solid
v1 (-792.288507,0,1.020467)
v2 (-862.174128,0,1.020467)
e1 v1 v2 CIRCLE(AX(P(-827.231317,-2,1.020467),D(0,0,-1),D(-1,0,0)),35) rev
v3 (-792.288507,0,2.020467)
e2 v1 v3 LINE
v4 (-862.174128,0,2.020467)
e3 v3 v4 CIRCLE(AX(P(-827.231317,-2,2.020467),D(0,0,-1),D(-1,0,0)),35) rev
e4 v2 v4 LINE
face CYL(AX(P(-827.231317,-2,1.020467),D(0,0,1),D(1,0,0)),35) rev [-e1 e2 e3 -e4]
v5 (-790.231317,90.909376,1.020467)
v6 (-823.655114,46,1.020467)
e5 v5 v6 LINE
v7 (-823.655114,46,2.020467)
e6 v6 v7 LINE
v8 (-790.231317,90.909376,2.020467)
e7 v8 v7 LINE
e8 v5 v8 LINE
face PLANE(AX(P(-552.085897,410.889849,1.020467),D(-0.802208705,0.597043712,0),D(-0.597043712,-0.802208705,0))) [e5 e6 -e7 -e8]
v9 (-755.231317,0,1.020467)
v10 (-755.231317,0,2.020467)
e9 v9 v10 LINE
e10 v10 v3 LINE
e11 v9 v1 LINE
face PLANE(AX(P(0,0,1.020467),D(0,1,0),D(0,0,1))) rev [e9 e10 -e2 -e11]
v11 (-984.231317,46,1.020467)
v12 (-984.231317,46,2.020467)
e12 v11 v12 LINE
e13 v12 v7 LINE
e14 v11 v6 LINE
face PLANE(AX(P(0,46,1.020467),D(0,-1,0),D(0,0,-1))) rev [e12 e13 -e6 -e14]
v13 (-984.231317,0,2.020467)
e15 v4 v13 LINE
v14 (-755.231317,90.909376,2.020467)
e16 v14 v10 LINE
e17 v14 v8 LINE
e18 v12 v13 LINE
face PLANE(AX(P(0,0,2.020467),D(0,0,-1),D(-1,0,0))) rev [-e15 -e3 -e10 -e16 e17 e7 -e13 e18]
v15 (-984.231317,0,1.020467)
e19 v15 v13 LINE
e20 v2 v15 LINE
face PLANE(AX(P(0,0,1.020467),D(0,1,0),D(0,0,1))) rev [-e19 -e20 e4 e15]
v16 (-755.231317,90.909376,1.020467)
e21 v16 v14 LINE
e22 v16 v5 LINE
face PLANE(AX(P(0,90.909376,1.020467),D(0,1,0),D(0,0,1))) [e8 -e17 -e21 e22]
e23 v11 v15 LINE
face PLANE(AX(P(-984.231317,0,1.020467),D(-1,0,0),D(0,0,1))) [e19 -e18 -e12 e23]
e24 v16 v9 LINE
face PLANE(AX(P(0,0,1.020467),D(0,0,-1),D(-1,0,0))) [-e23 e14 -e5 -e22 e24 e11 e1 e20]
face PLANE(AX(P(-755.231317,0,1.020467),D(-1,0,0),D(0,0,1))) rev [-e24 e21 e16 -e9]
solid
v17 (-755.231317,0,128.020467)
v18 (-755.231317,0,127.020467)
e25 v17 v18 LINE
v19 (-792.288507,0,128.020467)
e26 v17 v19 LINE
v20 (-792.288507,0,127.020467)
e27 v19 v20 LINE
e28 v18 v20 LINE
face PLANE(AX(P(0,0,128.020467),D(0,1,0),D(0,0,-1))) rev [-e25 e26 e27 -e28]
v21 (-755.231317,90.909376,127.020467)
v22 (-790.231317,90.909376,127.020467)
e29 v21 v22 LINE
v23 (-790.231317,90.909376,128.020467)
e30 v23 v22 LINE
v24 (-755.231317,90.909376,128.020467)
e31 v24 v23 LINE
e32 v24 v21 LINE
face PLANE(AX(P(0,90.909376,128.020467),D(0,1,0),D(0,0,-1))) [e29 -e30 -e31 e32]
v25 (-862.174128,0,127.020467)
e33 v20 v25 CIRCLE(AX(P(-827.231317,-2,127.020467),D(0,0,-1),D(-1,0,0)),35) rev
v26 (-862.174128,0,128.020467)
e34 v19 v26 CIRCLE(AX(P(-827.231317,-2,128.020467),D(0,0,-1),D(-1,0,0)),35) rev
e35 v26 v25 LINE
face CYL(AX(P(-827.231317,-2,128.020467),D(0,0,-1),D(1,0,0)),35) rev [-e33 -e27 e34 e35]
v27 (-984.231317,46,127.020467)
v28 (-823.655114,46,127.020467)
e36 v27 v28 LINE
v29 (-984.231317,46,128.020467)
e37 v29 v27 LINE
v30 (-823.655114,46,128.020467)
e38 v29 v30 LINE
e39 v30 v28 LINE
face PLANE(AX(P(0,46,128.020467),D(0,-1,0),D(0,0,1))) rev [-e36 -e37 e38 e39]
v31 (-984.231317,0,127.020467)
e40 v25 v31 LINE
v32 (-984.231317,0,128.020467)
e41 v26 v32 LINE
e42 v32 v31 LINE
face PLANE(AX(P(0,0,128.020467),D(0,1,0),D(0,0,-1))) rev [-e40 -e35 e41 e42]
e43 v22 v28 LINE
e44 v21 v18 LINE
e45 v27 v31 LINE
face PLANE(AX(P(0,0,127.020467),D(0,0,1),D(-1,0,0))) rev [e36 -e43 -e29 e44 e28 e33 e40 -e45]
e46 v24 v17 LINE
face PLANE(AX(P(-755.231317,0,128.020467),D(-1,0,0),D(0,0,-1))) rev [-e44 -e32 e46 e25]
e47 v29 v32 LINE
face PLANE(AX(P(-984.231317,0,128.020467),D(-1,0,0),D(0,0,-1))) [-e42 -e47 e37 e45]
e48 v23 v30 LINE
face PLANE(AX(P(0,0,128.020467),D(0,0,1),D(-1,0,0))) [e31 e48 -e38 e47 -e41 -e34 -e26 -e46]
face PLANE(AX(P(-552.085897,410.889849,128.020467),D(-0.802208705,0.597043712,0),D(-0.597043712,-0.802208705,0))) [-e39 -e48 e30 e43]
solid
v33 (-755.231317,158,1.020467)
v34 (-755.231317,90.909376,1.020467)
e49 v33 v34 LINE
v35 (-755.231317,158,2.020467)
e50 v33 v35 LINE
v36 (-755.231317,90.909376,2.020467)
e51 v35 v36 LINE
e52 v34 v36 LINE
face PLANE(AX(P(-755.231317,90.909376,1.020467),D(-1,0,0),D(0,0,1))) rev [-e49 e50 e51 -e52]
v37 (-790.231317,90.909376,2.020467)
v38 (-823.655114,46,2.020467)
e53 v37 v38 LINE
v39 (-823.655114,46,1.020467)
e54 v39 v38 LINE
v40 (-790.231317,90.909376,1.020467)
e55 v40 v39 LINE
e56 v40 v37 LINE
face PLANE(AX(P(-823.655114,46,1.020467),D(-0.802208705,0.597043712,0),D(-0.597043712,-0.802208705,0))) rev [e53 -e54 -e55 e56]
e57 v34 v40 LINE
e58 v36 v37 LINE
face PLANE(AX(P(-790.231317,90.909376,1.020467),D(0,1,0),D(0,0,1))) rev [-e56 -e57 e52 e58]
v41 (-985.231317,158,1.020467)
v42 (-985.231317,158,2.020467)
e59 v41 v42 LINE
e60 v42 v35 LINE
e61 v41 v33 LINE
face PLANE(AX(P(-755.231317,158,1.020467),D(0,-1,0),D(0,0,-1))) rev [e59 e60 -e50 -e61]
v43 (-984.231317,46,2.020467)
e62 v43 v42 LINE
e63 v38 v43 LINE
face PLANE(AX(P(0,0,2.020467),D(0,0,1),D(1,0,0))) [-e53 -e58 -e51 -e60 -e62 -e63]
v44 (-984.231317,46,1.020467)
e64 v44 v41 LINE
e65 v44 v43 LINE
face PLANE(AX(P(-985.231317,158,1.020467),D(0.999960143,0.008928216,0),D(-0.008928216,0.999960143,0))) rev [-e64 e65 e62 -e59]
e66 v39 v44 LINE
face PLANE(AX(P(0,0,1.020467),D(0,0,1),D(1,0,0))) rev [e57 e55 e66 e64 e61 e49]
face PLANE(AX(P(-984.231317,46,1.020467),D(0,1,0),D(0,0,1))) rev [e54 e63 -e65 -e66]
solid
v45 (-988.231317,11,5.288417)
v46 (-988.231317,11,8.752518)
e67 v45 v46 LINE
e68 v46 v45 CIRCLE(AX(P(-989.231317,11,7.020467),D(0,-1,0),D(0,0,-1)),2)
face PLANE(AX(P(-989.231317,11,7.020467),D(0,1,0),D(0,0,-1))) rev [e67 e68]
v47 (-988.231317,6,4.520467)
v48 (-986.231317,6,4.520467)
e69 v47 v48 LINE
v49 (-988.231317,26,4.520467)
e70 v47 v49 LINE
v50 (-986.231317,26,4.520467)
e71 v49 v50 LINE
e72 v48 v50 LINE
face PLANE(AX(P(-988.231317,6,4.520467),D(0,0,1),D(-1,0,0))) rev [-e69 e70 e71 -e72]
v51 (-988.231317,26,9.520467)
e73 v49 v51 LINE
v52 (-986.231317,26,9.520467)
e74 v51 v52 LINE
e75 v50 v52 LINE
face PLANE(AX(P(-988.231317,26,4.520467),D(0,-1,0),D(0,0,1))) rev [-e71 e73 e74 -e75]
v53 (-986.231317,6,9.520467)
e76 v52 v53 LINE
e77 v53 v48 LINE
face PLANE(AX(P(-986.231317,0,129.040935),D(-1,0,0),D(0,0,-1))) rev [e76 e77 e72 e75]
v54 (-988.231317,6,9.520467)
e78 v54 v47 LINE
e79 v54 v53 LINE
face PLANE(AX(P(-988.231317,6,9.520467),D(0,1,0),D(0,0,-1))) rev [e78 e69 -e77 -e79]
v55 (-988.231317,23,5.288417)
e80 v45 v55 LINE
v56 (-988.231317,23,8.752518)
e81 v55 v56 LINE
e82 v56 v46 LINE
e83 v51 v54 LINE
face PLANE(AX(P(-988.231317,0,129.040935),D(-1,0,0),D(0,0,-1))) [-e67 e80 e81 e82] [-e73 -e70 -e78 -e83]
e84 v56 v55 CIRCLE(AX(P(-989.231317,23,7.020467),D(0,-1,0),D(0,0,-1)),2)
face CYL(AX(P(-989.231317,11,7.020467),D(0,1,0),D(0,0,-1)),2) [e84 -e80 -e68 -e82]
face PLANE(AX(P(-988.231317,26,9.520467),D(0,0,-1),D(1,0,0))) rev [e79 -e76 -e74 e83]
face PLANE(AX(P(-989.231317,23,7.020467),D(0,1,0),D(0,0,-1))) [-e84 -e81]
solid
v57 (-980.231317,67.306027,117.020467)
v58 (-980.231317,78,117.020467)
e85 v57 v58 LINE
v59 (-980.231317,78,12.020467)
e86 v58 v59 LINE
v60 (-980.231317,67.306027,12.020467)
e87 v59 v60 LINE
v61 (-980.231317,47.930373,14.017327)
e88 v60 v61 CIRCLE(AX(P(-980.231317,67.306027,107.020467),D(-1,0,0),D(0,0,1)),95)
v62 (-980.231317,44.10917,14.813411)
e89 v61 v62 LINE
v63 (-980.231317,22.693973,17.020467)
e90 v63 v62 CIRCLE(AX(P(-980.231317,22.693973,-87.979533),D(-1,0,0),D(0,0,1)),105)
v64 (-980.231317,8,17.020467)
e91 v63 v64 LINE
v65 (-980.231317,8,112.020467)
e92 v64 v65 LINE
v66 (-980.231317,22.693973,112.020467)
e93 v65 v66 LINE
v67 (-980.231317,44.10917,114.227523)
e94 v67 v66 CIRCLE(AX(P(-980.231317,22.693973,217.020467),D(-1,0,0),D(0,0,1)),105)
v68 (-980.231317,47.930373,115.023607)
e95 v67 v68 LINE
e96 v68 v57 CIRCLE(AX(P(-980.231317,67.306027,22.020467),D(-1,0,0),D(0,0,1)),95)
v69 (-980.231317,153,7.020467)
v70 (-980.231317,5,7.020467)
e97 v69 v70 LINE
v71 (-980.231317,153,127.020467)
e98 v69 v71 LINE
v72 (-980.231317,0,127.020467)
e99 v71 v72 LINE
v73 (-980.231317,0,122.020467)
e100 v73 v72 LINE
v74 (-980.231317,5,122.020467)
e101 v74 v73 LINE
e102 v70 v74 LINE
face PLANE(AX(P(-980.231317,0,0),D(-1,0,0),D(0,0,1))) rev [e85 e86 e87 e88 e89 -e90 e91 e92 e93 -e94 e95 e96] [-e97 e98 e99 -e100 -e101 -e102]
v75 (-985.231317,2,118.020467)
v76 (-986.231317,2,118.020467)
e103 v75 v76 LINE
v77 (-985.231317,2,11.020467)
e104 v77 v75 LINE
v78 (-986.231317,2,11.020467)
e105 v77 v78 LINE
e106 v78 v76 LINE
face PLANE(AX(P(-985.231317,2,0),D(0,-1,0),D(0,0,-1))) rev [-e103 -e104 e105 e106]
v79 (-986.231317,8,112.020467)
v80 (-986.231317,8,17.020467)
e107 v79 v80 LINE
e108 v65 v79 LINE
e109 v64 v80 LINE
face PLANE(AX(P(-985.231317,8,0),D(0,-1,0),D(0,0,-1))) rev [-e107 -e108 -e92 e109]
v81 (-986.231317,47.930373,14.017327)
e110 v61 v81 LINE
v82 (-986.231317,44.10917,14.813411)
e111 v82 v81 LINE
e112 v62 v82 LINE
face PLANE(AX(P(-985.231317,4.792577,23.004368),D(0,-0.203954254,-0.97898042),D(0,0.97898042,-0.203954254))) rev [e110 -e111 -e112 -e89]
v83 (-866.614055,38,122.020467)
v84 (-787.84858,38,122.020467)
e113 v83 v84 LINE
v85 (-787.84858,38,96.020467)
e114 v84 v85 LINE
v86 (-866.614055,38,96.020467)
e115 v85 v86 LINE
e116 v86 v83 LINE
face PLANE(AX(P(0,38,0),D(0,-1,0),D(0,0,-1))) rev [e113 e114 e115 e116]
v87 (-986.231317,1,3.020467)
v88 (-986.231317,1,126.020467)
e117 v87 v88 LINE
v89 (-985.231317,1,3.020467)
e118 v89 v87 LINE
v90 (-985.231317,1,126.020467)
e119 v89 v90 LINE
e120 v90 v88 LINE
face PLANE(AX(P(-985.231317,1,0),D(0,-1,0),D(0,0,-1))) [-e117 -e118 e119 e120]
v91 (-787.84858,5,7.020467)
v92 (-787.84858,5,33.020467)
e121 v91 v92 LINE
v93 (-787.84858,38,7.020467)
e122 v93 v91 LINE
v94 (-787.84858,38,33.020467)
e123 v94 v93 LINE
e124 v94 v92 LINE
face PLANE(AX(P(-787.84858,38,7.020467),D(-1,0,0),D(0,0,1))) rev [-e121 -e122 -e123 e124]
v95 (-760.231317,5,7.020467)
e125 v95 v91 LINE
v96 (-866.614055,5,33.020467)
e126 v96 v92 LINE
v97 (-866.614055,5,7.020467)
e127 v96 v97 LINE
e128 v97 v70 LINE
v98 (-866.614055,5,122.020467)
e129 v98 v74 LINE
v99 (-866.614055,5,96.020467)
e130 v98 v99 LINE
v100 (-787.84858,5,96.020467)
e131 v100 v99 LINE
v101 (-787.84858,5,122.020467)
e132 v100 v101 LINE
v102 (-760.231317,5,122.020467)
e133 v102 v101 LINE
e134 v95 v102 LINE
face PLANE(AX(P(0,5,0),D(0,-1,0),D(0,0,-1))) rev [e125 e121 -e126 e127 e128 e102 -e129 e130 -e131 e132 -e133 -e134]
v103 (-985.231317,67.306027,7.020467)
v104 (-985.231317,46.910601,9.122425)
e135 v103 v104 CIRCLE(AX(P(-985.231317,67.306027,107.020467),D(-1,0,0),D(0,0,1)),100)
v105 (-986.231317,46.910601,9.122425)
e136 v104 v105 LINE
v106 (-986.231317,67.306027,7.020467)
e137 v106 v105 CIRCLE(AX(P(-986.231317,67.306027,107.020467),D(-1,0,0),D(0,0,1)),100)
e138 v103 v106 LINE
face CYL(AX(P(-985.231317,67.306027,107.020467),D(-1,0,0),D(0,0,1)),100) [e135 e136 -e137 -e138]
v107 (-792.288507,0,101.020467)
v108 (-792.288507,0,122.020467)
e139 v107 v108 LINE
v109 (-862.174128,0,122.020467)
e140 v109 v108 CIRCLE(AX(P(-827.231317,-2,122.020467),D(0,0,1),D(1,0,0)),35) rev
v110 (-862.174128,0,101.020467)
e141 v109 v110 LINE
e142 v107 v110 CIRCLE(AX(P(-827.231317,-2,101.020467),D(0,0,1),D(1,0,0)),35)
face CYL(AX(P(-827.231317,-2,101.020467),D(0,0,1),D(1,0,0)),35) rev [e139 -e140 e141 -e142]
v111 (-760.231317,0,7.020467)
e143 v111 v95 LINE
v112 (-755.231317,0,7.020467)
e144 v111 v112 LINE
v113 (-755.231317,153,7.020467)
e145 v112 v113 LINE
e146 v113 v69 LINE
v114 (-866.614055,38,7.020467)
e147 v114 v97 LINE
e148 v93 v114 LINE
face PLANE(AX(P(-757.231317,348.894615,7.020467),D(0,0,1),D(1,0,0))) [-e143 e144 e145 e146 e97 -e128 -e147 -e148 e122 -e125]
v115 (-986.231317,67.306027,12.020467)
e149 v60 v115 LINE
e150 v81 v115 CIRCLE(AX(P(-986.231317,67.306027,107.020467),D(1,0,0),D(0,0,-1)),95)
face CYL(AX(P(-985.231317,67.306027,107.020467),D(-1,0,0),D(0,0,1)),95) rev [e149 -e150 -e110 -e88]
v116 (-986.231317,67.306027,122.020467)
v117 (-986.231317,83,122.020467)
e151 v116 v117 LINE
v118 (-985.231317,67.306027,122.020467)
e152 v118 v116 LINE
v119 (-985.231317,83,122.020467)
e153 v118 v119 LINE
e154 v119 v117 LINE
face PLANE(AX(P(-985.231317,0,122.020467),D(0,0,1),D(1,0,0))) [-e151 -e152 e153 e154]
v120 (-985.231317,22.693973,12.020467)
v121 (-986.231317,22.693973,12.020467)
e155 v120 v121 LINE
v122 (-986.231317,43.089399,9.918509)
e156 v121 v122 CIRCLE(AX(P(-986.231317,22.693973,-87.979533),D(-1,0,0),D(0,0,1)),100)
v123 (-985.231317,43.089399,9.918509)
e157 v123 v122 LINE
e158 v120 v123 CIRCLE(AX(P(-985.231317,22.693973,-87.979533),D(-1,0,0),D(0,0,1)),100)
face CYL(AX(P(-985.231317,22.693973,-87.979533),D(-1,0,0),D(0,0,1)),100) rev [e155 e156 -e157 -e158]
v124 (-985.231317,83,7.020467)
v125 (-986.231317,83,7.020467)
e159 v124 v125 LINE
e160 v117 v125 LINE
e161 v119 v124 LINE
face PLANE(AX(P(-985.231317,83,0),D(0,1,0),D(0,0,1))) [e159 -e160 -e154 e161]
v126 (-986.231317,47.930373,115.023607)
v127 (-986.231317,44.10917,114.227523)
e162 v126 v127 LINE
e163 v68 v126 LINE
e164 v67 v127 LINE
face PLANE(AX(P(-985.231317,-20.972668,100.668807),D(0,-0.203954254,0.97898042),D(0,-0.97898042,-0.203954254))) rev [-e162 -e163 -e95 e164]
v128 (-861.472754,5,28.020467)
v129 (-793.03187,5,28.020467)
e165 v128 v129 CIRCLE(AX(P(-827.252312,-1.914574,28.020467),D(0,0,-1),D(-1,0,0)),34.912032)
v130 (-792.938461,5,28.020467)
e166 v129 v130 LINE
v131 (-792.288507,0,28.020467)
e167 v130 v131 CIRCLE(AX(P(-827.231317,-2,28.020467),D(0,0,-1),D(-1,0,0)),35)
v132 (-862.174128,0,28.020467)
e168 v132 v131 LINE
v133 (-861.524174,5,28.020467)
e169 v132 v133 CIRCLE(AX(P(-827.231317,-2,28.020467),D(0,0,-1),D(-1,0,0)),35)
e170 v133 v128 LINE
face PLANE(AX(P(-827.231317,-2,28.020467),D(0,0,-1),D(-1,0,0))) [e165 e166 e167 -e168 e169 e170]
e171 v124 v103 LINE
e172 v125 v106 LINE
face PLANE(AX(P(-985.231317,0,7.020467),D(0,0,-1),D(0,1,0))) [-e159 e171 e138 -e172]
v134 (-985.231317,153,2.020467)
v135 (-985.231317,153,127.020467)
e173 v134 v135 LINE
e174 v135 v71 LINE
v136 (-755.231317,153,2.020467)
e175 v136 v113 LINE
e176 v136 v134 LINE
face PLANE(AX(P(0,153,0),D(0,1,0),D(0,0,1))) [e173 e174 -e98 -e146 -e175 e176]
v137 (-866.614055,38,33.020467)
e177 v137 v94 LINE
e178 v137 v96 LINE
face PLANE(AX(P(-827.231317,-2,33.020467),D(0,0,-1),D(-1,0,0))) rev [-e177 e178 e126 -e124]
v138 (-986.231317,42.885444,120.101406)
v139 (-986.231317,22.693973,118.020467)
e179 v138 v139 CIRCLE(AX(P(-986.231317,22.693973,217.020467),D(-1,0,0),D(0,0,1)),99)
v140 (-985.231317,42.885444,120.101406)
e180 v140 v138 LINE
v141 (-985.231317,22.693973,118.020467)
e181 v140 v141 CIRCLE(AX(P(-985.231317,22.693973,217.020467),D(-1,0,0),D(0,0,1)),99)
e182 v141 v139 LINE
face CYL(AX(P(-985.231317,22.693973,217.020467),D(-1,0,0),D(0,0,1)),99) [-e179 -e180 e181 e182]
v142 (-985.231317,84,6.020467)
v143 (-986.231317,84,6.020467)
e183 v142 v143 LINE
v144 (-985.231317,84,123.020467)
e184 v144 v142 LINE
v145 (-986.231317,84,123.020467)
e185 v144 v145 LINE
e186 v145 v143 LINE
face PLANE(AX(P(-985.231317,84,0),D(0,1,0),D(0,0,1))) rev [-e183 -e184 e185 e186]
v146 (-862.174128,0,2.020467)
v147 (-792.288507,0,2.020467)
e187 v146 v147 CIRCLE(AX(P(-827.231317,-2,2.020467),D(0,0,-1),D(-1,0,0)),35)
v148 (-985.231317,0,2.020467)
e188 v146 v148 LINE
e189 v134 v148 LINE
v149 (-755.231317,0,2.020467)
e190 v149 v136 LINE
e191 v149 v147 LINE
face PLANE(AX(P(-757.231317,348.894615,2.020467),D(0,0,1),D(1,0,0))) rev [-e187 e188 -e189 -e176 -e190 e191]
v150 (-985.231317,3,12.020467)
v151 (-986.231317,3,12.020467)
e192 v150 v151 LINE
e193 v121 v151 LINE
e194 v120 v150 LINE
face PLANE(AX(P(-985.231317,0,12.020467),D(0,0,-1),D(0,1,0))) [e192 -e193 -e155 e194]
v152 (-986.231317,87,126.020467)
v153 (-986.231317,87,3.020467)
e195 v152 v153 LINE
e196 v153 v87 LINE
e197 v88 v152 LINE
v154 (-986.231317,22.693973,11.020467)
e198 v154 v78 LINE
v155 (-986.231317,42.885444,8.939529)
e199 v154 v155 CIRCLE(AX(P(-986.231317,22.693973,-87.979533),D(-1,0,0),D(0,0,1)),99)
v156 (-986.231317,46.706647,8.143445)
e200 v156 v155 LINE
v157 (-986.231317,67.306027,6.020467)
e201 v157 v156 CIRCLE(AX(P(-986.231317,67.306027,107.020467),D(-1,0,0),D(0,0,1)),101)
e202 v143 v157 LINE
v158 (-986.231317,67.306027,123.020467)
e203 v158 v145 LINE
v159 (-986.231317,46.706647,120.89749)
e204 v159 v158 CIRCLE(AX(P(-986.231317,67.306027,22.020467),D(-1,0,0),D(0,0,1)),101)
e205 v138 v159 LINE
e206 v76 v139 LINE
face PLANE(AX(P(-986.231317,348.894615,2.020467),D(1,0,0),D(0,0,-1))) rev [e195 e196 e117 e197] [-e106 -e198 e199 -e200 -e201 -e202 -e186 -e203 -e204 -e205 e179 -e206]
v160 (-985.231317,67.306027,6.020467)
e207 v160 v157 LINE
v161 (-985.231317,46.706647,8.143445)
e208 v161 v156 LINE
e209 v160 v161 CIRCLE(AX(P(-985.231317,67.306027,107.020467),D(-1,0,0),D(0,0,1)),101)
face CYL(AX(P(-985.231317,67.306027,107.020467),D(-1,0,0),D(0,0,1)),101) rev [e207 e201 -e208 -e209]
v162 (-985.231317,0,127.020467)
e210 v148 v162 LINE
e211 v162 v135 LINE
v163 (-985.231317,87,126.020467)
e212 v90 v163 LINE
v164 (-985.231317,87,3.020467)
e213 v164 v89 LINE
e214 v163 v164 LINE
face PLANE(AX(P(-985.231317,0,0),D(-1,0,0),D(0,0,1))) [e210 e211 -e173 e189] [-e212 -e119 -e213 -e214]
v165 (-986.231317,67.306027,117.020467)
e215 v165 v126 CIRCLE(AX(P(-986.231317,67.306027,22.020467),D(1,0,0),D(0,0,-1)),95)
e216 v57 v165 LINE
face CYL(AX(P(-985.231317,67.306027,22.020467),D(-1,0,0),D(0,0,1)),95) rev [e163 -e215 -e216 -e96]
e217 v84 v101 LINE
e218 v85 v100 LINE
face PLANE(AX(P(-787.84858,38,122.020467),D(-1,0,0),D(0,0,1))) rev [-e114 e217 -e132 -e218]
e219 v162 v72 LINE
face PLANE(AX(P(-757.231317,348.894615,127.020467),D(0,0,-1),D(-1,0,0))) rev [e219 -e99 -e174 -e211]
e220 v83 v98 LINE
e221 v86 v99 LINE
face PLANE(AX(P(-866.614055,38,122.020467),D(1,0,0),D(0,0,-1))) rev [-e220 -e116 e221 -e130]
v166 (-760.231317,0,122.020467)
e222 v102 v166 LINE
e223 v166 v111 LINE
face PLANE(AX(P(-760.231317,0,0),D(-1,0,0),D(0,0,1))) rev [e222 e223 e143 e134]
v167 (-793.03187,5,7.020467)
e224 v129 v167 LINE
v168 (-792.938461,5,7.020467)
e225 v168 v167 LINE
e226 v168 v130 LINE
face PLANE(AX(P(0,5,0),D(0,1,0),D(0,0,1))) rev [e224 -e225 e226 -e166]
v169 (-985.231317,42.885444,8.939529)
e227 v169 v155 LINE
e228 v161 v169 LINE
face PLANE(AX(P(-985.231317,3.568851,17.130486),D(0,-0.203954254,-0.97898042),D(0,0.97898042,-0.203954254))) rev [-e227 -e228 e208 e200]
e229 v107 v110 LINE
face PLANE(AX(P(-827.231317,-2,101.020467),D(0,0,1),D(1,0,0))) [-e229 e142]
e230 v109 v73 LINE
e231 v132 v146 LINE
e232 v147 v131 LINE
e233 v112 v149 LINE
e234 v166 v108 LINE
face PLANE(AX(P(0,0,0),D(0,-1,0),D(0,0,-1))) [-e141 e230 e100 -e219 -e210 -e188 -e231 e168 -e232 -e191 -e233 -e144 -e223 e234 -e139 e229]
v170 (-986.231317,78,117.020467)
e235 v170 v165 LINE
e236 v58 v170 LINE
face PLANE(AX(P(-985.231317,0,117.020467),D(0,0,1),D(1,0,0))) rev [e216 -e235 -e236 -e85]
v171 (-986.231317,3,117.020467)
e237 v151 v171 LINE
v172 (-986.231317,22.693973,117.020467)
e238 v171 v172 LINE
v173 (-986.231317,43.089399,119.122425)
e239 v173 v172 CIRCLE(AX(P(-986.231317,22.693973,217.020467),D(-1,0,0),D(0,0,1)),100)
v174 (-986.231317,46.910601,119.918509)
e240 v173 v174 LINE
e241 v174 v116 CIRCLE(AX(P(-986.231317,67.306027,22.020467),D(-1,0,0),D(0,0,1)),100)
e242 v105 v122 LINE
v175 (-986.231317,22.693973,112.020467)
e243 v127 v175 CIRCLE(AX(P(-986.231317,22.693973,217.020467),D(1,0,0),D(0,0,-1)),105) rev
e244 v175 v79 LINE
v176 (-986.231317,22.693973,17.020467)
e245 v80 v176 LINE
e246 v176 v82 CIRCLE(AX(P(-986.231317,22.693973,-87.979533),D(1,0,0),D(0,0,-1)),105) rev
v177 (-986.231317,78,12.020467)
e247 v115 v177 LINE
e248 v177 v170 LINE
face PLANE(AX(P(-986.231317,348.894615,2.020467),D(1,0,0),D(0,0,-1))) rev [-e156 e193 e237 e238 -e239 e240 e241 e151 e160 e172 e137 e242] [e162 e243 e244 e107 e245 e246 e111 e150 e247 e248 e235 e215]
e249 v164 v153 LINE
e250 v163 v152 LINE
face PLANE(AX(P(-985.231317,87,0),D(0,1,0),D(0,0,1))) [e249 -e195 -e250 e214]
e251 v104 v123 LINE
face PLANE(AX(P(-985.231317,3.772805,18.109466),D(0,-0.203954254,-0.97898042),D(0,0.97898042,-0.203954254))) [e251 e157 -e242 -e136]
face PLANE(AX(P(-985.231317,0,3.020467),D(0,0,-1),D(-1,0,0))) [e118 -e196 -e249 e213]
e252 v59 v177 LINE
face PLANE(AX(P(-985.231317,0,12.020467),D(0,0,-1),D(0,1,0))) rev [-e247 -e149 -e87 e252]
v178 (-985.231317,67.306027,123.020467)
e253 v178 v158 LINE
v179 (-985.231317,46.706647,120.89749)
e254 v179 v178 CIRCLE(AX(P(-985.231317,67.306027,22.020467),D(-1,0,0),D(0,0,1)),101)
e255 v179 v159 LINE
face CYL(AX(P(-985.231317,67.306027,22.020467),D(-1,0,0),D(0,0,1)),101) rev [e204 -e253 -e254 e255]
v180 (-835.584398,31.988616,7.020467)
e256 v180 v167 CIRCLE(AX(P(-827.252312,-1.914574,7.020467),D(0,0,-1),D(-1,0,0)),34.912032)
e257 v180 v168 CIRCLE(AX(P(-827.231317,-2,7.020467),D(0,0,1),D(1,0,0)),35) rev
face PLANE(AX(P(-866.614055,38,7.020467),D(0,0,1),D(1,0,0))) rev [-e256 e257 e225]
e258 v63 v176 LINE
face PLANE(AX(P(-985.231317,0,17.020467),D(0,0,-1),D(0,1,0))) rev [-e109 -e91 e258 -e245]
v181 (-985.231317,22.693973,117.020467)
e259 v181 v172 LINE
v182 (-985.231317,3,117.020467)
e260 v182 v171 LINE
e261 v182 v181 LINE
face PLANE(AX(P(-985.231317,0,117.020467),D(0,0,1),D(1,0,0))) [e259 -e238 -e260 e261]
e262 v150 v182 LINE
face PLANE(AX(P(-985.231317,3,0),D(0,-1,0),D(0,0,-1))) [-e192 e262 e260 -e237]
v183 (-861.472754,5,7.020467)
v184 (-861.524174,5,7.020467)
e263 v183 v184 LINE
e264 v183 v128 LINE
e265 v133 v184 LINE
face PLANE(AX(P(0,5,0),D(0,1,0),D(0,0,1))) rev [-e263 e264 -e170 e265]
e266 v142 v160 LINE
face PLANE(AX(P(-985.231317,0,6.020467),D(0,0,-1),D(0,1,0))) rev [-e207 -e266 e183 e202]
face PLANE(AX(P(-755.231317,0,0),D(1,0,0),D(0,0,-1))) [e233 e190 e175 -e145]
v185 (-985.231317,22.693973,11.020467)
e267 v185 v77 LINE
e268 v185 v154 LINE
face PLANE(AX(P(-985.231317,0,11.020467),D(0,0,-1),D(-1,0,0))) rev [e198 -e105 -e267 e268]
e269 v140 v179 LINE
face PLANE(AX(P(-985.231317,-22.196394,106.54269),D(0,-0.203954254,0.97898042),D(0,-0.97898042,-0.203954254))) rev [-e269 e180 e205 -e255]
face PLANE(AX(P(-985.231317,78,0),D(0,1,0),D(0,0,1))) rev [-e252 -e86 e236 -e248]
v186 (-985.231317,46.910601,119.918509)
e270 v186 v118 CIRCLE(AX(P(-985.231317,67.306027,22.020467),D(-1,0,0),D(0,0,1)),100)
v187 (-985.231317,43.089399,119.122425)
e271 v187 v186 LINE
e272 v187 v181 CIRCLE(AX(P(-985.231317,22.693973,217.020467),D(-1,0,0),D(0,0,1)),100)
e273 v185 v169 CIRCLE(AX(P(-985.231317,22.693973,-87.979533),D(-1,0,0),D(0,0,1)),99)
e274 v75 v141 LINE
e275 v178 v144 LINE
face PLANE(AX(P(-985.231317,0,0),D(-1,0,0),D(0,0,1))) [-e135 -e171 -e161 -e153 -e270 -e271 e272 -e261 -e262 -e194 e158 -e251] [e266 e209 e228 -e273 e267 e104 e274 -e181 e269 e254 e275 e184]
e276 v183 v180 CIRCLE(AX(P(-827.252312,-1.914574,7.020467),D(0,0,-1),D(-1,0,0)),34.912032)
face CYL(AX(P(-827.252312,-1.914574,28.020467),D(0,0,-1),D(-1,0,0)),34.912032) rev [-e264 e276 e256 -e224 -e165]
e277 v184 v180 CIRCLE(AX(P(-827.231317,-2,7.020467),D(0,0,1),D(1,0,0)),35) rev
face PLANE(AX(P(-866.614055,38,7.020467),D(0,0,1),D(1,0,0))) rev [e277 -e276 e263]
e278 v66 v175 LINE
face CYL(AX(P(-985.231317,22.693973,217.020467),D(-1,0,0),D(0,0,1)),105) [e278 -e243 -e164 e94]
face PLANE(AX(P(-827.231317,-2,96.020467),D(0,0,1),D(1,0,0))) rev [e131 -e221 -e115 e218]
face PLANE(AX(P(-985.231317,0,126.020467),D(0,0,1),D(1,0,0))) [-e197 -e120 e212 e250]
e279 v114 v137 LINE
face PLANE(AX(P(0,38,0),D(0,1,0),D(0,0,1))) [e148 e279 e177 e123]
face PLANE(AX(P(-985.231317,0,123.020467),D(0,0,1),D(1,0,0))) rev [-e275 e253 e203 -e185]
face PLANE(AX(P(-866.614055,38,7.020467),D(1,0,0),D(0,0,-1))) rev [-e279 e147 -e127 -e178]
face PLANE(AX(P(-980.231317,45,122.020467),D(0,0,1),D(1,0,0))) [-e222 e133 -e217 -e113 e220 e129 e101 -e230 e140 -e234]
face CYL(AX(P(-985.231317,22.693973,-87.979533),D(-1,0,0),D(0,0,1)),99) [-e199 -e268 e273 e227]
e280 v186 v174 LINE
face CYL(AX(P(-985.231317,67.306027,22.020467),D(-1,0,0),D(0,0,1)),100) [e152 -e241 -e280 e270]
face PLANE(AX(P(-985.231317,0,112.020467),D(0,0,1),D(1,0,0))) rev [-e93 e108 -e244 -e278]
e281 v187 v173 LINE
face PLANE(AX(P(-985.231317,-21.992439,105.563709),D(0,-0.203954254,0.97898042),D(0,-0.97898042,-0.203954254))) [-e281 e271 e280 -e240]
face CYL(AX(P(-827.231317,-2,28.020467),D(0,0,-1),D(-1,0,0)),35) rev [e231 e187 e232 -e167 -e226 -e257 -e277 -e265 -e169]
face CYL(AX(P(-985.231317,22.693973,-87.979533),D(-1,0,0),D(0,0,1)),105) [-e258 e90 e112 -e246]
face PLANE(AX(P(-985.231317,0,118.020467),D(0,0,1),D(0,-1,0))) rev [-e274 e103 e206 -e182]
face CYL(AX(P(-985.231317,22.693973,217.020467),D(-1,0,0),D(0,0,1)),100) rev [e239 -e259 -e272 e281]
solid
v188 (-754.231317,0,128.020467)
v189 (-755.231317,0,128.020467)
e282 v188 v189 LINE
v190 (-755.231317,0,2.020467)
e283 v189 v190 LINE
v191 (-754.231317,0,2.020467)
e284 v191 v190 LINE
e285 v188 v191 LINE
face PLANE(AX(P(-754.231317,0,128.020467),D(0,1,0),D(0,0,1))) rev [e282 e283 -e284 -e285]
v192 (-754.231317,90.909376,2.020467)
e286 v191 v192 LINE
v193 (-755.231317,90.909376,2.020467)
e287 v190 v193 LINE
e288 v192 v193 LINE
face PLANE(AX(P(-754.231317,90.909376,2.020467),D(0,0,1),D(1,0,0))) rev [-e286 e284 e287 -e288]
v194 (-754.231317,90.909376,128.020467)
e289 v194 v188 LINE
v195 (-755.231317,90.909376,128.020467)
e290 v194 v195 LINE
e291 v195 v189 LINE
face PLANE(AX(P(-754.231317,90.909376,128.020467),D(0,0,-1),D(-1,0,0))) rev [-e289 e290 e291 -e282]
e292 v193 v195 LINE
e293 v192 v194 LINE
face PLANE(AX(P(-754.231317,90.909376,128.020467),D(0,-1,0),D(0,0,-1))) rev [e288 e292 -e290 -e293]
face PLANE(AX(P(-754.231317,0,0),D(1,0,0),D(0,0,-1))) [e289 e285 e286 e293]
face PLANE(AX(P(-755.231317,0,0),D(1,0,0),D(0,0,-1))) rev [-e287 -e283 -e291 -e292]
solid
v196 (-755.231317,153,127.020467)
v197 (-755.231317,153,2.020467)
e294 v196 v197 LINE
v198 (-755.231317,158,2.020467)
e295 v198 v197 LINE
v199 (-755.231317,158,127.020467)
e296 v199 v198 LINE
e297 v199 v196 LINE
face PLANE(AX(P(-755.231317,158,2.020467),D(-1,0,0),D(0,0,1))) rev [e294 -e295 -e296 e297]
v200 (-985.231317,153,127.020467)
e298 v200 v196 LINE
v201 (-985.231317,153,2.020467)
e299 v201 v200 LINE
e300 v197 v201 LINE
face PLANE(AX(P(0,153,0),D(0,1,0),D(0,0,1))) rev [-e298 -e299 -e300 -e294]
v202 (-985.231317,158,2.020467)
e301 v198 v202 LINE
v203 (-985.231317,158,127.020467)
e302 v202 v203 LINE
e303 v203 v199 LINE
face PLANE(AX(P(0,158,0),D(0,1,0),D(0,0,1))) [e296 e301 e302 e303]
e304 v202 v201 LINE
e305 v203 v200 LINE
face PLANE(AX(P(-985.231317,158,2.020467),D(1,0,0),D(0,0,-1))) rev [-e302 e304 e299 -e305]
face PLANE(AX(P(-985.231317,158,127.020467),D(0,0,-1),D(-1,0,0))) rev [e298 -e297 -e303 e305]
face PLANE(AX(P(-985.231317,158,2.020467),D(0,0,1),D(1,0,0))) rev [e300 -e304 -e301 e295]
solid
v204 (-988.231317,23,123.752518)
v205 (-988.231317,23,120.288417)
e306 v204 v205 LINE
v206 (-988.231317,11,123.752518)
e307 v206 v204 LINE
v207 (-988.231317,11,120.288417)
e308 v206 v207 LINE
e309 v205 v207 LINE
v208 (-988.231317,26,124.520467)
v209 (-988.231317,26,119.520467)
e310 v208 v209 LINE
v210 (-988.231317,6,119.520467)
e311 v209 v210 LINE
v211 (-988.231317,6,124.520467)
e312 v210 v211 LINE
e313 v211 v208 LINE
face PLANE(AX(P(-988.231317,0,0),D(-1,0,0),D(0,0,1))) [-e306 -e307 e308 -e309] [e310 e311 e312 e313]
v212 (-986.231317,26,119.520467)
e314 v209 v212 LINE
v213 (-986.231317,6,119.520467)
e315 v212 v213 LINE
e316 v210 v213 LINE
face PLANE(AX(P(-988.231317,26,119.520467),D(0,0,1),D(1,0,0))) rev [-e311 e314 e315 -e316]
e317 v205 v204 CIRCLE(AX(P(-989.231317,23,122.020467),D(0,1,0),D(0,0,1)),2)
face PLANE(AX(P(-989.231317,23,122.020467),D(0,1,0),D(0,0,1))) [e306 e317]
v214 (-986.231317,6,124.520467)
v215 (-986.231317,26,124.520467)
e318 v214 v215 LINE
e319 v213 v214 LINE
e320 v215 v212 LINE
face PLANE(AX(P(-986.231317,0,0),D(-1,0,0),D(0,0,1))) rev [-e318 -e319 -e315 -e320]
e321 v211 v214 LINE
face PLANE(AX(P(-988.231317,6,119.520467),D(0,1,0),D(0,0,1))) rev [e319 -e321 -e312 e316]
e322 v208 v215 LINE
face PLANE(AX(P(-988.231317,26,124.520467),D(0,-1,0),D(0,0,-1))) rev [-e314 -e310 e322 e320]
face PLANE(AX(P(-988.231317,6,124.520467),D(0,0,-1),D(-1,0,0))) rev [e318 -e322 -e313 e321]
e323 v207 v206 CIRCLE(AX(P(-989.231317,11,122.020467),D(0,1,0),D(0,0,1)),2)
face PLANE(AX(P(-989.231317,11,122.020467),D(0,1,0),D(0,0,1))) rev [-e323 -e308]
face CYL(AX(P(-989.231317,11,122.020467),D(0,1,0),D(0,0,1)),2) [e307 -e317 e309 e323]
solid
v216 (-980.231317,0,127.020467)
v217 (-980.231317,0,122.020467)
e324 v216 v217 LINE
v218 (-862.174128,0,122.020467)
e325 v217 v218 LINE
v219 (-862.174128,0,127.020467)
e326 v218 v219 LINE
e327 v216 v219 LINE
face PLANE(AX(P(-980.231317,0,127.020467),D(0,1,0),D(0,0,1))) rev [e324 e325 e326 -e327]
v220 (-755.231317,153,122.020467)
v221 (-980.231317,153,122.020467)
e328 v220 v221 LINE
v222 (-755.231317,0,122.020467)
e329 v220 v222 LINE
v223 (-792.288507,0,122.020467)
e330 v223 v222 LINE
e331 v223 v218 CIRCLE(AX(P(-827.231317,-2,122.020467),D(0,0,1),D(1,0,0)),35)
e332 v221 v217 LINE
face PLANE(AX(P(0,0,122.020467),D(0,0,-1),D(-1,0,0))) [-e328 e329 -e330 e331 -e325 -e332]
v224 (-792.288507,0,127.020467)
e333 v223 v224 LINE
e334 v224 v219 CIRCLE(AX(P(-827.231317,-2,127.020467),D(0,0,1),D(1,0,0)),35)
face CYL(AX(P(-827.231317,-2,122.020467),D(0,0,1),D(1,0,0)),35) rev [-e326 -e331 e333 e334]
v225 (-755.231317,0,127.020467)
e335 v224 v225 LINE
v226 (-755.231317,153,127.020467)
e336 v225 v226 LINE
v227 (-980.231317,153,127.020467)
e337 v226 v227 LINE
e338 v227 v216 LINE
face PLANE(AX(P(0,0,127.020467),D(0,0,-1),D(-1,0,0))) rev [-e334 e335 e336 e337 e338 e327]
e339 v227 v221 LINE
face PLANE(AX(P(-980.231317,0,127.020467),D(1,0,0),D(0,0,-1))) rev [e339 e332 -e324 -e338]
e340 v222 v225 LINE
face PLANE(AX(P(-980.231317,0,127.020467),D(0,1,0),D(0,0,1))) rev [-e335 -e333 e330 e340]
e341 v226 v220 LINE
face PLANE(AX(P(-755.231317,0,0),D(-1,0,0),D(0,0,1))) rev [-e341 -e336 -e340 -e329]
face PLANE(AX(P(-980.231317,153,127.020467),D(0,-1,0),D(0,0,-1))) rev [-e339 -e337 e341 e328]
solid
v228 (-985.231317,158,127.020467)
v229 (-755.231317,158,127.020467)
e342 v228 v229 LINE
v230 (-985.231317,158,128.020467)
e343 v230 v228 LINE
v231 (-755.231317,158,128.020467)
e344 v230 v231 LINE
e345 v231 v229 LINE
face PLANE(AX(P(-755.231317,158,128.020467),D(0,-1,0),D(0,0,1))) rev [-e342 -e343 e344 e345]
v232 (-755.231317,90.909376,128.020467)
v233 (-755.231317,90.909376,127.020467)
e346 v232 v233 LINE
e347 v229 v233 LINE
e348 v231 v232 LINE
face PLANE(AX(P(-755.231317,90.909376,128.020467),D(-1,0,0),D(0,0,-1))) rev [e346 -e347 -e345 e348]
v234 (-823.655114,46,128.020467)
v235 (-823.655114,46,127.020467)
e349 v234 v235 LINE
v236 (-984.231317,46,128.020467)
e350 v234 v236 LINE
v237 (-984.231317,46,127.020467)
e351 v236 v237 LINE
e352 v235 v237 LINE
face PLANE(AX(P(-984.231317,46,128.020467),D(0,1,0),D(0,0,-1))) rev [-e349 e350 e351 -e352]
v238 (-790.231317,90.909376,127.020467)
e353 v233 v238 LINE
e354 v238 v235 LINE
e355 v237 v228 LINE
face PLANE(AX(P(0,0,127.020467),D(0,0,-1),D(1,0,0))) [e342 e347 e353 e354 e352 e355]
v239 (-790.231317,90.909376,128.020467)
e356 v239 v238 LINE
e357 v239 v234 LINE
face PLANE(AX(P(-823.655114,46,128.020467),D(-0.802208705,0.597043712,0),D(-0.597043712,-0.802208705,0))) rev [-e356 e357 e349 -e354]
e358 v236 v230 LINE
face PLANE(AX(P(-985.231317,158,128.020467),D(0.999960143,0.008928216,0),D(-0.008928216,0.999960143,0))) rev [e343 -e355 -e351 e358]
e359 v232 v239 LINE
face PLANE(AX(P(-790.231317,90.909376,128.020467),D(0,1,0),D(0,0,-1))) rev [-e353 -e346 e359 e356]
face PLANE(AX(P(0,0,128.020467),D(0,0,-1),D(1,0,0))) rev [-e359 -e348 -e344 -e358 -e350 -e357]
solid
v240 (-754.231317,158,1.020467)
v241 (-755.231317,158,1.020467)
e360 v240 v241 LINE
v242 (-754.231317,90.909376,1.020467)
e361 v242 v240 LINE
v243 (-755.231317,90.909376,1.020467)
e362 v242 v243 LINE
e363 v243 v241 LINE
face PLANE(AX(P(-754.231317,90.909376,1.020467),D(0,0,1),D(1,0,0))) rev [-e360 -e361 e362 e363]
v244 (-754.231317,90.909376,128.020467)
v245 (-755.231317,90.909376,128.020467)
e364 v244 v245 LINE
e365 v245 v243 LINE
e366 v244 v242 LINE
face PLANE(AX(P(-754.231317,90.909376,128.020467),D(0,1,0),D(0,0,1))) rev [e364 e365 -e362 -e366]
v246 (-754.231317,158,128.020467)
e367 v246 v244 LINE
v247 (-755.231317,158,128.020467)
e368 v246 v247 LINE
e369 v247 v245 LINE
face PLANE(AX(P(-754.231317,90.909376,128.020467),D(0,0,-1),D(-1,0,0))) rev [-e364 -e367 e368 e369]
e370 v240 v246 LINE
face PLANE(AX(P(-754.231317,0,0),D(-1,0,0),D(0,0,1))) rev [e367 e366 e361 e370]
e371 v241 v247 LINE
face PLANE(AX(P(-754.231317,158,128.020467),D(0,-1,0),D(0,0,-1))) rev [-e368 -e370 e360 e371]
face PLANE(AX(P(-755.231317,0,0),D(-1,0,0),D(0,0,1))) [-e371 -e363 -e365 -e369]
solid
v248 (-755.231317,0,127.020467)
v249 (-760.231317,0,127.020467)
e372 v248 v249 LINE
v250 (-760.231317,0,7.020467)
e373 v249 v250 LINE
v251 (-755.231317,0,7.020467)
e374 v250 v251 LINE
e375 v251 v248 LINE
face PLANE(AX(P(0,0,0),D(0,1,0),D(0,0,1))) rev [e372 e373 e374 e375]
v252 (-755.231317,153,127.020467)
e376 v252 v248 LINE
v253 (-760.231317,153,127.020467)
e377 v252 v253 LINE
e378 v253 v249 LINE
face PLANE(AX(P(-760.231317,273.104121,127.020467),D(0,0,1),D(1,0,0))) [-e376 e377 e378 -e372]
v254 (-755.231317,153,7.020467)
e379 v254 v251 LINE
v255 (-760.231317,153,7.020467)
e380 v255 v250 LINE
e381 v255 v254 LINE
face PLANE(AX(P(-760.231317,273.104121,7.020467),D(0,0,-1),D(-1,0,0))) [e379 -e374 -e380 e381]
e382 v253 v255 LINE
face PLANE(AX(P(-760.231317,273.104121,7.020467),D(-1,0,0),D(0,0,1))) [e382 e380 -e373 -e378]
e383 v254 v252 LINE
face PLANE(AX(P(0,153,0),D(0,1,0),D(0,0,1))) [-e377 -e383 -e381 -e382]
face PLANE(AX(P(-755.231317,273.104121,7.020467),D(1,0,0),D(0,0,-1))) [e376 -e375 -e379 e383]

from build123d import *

# Parameters (mm, degrees)
SKETCH_1_W                = 229
SKETCH_1_H                = 125
EXTRUDE_1_DEPTH           = 88
SKETCH_4_W                = 125
SKETCH_4_H                = 88
SKETCH_4_W_2              = 123
SKETCH_4_H_2              = 86
CUT_EXTRUDE_3_DEPTH       = 1
SKETCH_5_W                = 125
SKETCH_5_H                = 88
EXTRUDE_2_DEPTH           = 1
SKETCH_11_W               = 5
SKETCH_11_H               = 20
EXTRUDE_3_DEPTH           = 2
SKETCH_12_R               = 2
EXTRUDE_4_DEPTH           = 12
SKETCH_13_R               = 35
CUT_EXTRUDE_7_DEPTH       = 26
CUT_EXTRUDE_START         = -26
SKETCH_14_R               = 35
CUT_EXTRUDE_8_DEPTH       = 26
SKETCH_16_W               = 229
SKETCH_16_H               = 125
EXTRUDE_6_DEPTH           = 70
SHELL_START               = -980.231317195
SHELL_1_OUTLINE_W         = 148
SHELL_1_OUTLINE_H         = 115
SHELL_1_DEPTH             = 113.617262665
SHELL_START_2             = -787.84857986
SHELL_1_2_OUTLINE_W       = 148
SHELL_1_2_OUTLINE_H       = 115
SHELL_1_2_DEPTH           = 31.617262665
SHELL_1_3_OUTLINE_W       = 3
SHELL_1_3_OUTLINE_H       = 63
SHELL_1_3_DEPTH           = 224
SHELL_START_3             = -981.231317195
SHELL_1_4_DEPTH           = 1
SHELL_START_4             = 7.020467364
SHELL_1_5_DEPTH           = 115
SHELL_START_5             = 33.020467364
SHELL_1_6_DEPTH           = 63
CUT_EXTRUDE_START_2       = -70
CUT_EXTRUDE_9_DEPTH       = 70
SKETCH_20_W               = 125
SKETCH_20_H               = 158
SKETCH_20_W_2             = 115
SKETCH_20_H_2             = 148
EXTRUDE_7_DEPTH           = 1
CUT_EXTRUDE_START_3       = -5
CUT_EXTRUDE_14_DEPTH      = 5
EXTRUDE_8_DEPTH           = 5
SKETCH_26_W               = 230
SKETCH_26_H               = 125
CUT_EXTRUDE_15_DEPTH      = 5
SKETCH_27_W               = 230
SKETCH_27_H               = 125
EXTRUDE_9_DEPTH           = 5
SKETCH_28_W               = 5
SKETCH_28_H               = 115
EXTRUDE_10_DEPTH          = 148
EXTRUDE_11_DEPTH          = 1
EXTRUDE_12_DEPTH          = 1
SKETCH_32_W               = 127
SKETCH_32_H               = 67.090624259
EXTRUDE_13_DEPTH          = 1
SKETCH_33_W               = 126
SKETCH_33_H               = 90.909375741
EXTRUDE_14_DEPTH          = 1
CUT_EXTRUDE_16_DEPTH      = 40
CUT_EXTRUDE_16_DEPTH_BACK = 10
SKETCH_34_W               = 225
SKETCH_34_H               = 5
SKETCH_35_W               = 220
SKETCH_35_H               = 153
EXTRUDE_16_DEPTH          = 5
SKETCH_36_W               = 5
SKETCH_36_H               = 153
EXTRUDE_17_DEPTH          = 5
CUT_EXTRUDE_17_DEPTH      = 5
SKETCH_39_W               = 115
SKETCH_39_H               = 5
CUT_EXTRUDE_18_DEPTH      = 5
SKETCH_40_W               = 5
SKETCH_40_H               = 120
EXTRUDE_19_DEPTH          = 153
SKETCH_45_W               = 78.76547467
SKETCH_45_H               = 26
EXTRUDE_21_DEPTH          = 33
CUT_EXTRUDE_20_DEPTH      = 21
SKETCH_48_R               = 34.912032086
CUT_EXTRUDE_21_DEPTH      = 21


with BuildPart() as part:
    # 스케치1 → 보스-돌출1 (new body)
    with BuildSketch(Plane(origin=(0, 0, 0), x_dir=(1, 0, 0), z_dir=(0, 1, 0))):
        with Locations((-871.731317195, -64.520467364)):
            Rectangle(SKETCH_1_W, SKETCH_1_H)
    extrude(amount=EXTRUDE_1_DEPTH)

    # 스케치4 → 컷-돌출3 (cut)
    # profile 1 of 2: a face of its own
    with BuildSketch(Plane.ZY.offset(986.231317195)):
        with Locations((64.520467364, 44)):
            Rectangle(SKETCH_4_W, SKETCH_4_H)
        with Locations((64.520467364, 44)):
            Rectangle(SKETCH_4_W_2, SKETCH_4_H_2, mode=Mode.SUBTRACT)
    # profile 2 of 2: a face of its own
    with BuildSketch(Plane.ZY.offset(986.231317195)):
        with BuildLine():
            Line((6.020467364, 84), (6.020467364, 67.306026885))
            ThreePointArc((6.020467364, 67.306026885), (6.552613646, 56.95178287), (8.143444971, 46.70664722))
            Line((8.143444971, 46.70664722), (8.939528918, 42.885444272))
            ThreePointArc((8.939528918, 42.885444272), (10.498858633, 32.843182595), (11.020467364, 22.693973115))
            Line((11.020467364, 22.693973115), (11.020467364, 2))
            Line((11.020467364, 2), (118.020467364, 2))
            Line((118.020467364, 2), (118.020467364, 22.693973115))
            ThreePointArc((118.020467364, 22.693973115), (118.542076095, 32.843182595), (120.10140581, 42.885444272))
            Line((120.10140581, 42.885444272), (120.897489758, 46.70664722))
            ThreePointArc((120.897489758, 46.70664722), (122.488321083, 56.95178287), (123.020467364, 67.306026885))
            Line((123.020467364, 67.306026885), (123.020467364, 84))
            Line((123.020467364, 84), (6.020467364, 84))
        make_face()
        with BuildLine():
            Line((12.020467364, 22.693973115), (12.020467364, 3))
            Line((12.020467364, 3), (117.020467364, 3))
            Line((117.020467364, 3), (117.020467364, 22.693973115))
            ThreePointArc((117.020467364, 22.693973115), (117.547344871, 32.945699863), (119.122425391, 43.089398526))
            Line((119.122425391, 43.089398526), (119.918509338, 46.910601474))
            ThreePointArc((119.918509338, 46.910601474), (121.493589858, 57.054300137), (122.020467364, 67.306026885))
            Line((122.020467364, 67.306026885), (122.020467364, 83))
            Line((122.020467364, 83), (7.020467364, 83))
            Line((7.020467364, 83), (7.020467364, 67.306026885))
            ThreePointArc((7.020467364, 67.306026885), (7.547344871, 57.054300137), (9.122425391, 46.910601474))
            Line((9.122425391, 46.910601474), (9.918509338, 43.089398526))
            ThreePointArc((9.918509338, 43.089398526), (11.493589858, 32.945699863), (12.020467364, 22.693973115))
        make_face(mode=Mode.SUBTRACT)
    extrude(amount=-CUT_EXTRUDE_3_DEPTH, mode=Mode.SUBTRACT)

    # 스케치5 → 보스-돌출2 (add)
    with BuildSketch(Plane(origin=(-757.231317195, 0, 0), x_dir=(0, 0, -1), z_dir=(1, 0, 0))):
        with Locations((-64.520467364, 44)):
            Rectangle(SKETCH_5_W, SKETCH_5_H)
    extrude(amount=EXTRUDE_2_DEPTH)

    # 스케치13 → 컷-돌출7 (cut)
    with BuildSketch(Plane.XY.offset(127.020467364)):
        with Locations((-827.231317195, -2)):
            Circle(SKETCH_13_R)
    extrude(amount=-CUT_EXTRUDE_7_DEPTH, mode=Mode.SUBTRACT)

    # 스케치14 → 컷-돌출8 (cut)
    with BuildSketch(Plane(origin=(0, 0, 2.020467364), x_dir=(-1, 0, 0), z_dir=(0, 0, -1)).offset(CUT_EXTRUDE_START)):
        with Locations((827.231317195, -2)):
            Circle(SKETCH_14_R)
    extrude(amount=CUT_EXTRUDE_8_DEPTH, mode=Mode.SUBTRACT)

    # 스케치16 → 보스-돌출6 (add)
    with BuildSketch(Plane(origin=(0, 88, 0), x_dir=(1, 0, 0), z_dir=(0, 1, 0))):
        with Locations((-870.731317195, -64.520467364)):
            Rectangle(SKETCH_16_W, SKETCH_16_H)
    extrude(amount=EXTRUDE_6_DEPTH)

    # 쉘1: read off the stored shape, not the designer's step
    # 쉘1 outline → 쉘1 (cut)
    with BuildSketch(Plane.YZ.offset(SHELL_START)):
        with Locations((79, 64.520467364)):
            Rectangle(SHELL_1_OUTLINE_W, SHELL_1_OUTLINE_H)
    extrude(amount=SHELL_1_DEPTH, mode=Mode.SUBTRACT)

    # Shell 1 2 outline → Shell 1 2 (cut)
    with BuildSketch(Plane.YZ.offset(SHELL_START_2)):
        with Locations((79, 64.520467364)):
            Rectangle(SHELL_1_2_OUTLINE_W, SHELL_1_2_OUTLINE_H)
    extrude(amount=SHELL_1_2_DEPTH, mode=Mode.SUBTRACT)

    # Shell 1 3 outline → Shell 1 3 (cut)
    with BuildSketch(Plane.YZ.offset(SHELL_START)):
        with Locations((6.5, 64.520467364)):
            Rectangle(SHELL_1_3_OUTLINE_W, SHELL_1_3_OUTLINE_H)
    extrude(amount=SHELL_1_3_DEPTH, mode=Mode.SUBTRACT)

    # Shell 1 4 outline → Shell 1 4 (cut)
    with BuildSketch(Plane.YZ.offset(SHELL_START_3)):
        with BuildLine():
            Line((8, 96.020467364), (8, 33.020467364))
            Line((8, 33.020467364), (8, 17.020467364))
            Line((8, 17.020467364), (22.693973115, 17.020467364))
            ThreePointArc((22.693973115, 17.020467364), (33.4582862, 16.467245983), (44.109169797, 14.813411437))
            Line((44.109169797, 14.813411437), (47.930372745, 14.017327489))
            ThreePointArc((47.930372745, 14.017327489), (57.566886475, 12.521000995), (67.306026885, 12.020467364))
            Line((67.306026885, 12.020467364), (78, 12.020467364))
            Line((78, 12.020467364), (78, 117.020467364))
            Line((78, 117.020467364), (67.306026885, 117.020467364))
            ThreePointArc((67.306026885, 117.020467364), (57.566886475, 116.519933734), (47.930372745, 115.023607239))
            Line((47.930372745, 115.023607239), (44.109169797, 114.227523292))
            ThreePointArc((44.109169797, 114.227523292), (33.4582862, 112.573688746), (22.693973115, 112.020467364))
            Line((22.693973115, 112.020467364), (8, 112.020467364))
            Line((8, 112.020467364), (8, 96.020467364))
        make_face()
    extrude(amount=SHELL_1_4_DEPTH, mode=Mode.SUBTRACT)

    # Shell 1 5 outline → Shell 1 5 (cut)
    with BuildSketch(Plane.XY.offset(SHELL_START_4)):
        with BuildLine():
            Line((-787.84857986, 5), (-787.84857986, 153))
            Line((-787.84857986, 153), (-866.61405453, 153))
            Line((-866.61405453, 153), (-866.61405453, 5))
            ThreePointArc((-866.61405453, 5), (-827.231317195, 38), (-787.84857986, 5))
        make_face()
    extrude(amount=SHELL_1_5_DEPTH, mode=Mode.SUBTRACT)

    # Shell 1 6 outline → Shell 1 6 (cut)
    with BuildSketch(Plane.XY.offset(SHELL_START_5)):
        with BuildLine():
            Line((-865.961150657, 8), (-788.501483733, 8))
            ThreePointArc((-788.501483733, 8), (-827.231317195, 38), (-865.961150657, 8))
        make_face()
    extrude(amount=SHELL_1_6_DEPTH, mode=Mode.SUBTRACT)

    # 스케치18 → 컷-돌출9 (cut)
    with BuildSketch(Plane(origin=(-981.231317195, 0, 0), x_dir=(0, 0, -1), z_dir=(1, 0, 0)).offset(CUT_EXTRUDE_START_2)):
        with BuildLine():
            Line((-17.020467364, 8), (-17.020467364, 22.693973115))
            ThreePointArc((-17.020467364, 22.693973115), (-16.467245983, 33.4582862), (-14.813411437, 44.109169797))
            Line((-14.813411437, 44.109169797), (-14.017327489, 47.930372745))
            ThreePointArc((-14.017327489, 47.930372745), (-12.521000995, 57.566886475), (-12.020467364, 67.306026885))
            Line((-12.020467364, 67.306026885), (-12.020467364, 78))
            Line((-12.020467364, 78), (-117.020467364, 78))
            Line((-117.020467364, 78), (-117.020467364, 67.306026885))
            ThreePointArc((-117.020467364, 67.306026885), (-116.519933734, 57.566886475), (-115.023607239, 47.930372745))
            Line((-115.023607239, 47.930372745), (-114.227523292, 44.109169797))
            ThreePointArc((-114.227523292, 44.109169797), (-112.573688746, 33.4582862), (-112.020467364, 22.693973115))
            Line((-112.020467364, 22.693973115), (-112.020467364, 8))
            Line((-112.020467364, 8), (-17.020467364, 8))
        make_face()
    extrude(amount=CUT_EXTRUDE_9_DEPTH, mode=Mode.SUBTRACT)

    # 스케치20 → 보스-돌출7 (add)
    with BuildSketch(Plane(origin=(-756.231317195, 0, 0), x_dir=(0, 0, -1), z_dir=(1, 0, 0))):
        with Locations((-64.520467364, 79)):
            Rectangle(SKETCH_20_W, SKETCH_20_H)
        with Locations((-64.520467364, 79)):
            Rectangle(SKETCH_20_W_2, SKETCH_20_H_2, mode=Mode.SUBTRACT)
    extrude(amount=EXTRUDE_7_DEPTH)

    # 스케치24 → 컷-돌출14 (cut)
    with BuildSketch(Plane.XY.offset(127.020467364).offset(CUT_EXTRUDE_START_3)):
        with BuildLine():
            Line((-755.231317195, 153), (-980.231317195, 153))
            Line((-980.231317195, 153), (-980.231317195, 5))
            Line((-980.231317195, 5), (-866.61405453, 5))
            ThreePointArc((-866.61405453, 5), (-827.231317195, 38), (-787.84857986, 5))
            Line((-787.84857986, 5), (-755.231317195, 5))
            Line((-755.231317195, 5), (-755.231317195, 153))
        make_face()
    extrude(amount=CUT_EXTRUDE_14_DEPTH, mode=Mode.SUBTRACT)

    # 스케치26 → 컷-돌출15 (cut)
    with BuildSketch(Plane(origin=(0, 158, 0), x_dir=(1, 0, 0), z_dir=(0, 1, 0))):
        with Locations((-870.231317195, -64.520467364)):
            Rectangle(SKETCH_26_W, SKETCH_26_H)
    extrude(amount=-CUT_EXTRUDE_15_DEPTH, mode=Mode.SUBTRACT)

    # 스케치34 → 컷-돌출16 (cut, two sides: drawn at the far end of the back side and taken through both)
    with BuildSketch(Plane(origin=(0, 5, 0), x_dir=(1, 0, 0), z_dir=(0, 1, 0)).offset(-CUT_EXTRUDE_16_DEPTH_BACK)):
        with Locations((-867.731317195, -124.520467364)):
            Rectangle(SKETCH_34_W, SKETCH_34_H)
    extrude(amount=CUT_EXTRUDE_16_DEPTH + CUT_EXTRUDE_16_DEPTH_BACK, mode=Mode.SUBTRACT)

    # 스케치39 → 컷-돌출18 (cut)
    with BuildSketch(Plane(origin=(-755.231317195, 0, 0), x_dir=(0, 0, -1), z_dir=(1, 0, 0))):
        with Locations((-64.520467364, 2.5)):
            Rectangle(SKETCH_39_W, SKETCH_39_H)
    extrude(amount=-CUT_EXTRUDE_18_DEPTH, mode=Mode.SUBTRACT)

    # 스케치45 → 보스-돌출21 (add)
    with BuildSketch(Plane(origin=(0, 5, 0), x_dir=(1, 0, 0), z_dir=(0, 1, 0))):
        with Locations((-827.231317195, -20.020467364)):
            Rectangle(SKETCH_45_W, SKETCH_45_H)
        with Locations((-827.231317195, -109.020467364)):
            Rectangle(SKETCH_45_W, SKETCH_45_H)
    extrude(amount=EXTRUDE_21_DEPTH)

    # 스케치47 → 컷-돌출20 (cut)
    with BuildSketch(Plane.XY.offset(122.020467364)):
        with BuildLine():
            Line((-862.174127614, 0), (-792.288506775, 0))
            ThreePointArc((-792.288506775, 0), (-827.231317195, 33), (-862.174127614, 0))
        make_face()
    extrude(amount=-CUT_EXTRUDE_20_DEPTH, mode=Mode.SUBTRACT)

    # 스케치48 → 컷-돌출21 (cut)
    with BuildSketch(Plane(origin=(0, 0, 7.020467364), x_dir=(-1, 0, 0), z_dir=(0, 0, -1))):
        with Locations((827.252311569, -1.914574066)):
            Circle(SKETCH_48_R)
    extrude(amount=-CUT_EXTRUDE_21_DEPTH, mode=Mode.SUBTRACT)


with BuildPart() as body_2:
    # 스케치11 → 보스-돌출3 (new body)
    with BuildSketch(Plane.ZY.offset(986.231317195)):
        with Locations((122.020467364, 16)):
            Rectangle(SKETCH_11_W, SKETCH_11_H)
    extrude(amount=EXTRUDE_3_DEPTH)

    # 스케치12 → 보스-돌출4 (add)
    with BuildSketch(Plane(origin=(0, 23, 0), x_dir=(1, 0, 0), z_dir=(0, 1, 0))):
        with Locations((-989.231317195, -122.020467364)):
            Circle(SKETCH_12_R)
    extrude(amount=-EXTRUDE_4_DEPTH)


with BuildPart() as body_3:
    # 대칭 복사1: mirrored copy
    add(body_2.part.mirror(Plane.XY.offset(64.520467364)))


with BuildPart() as body_4:
    # 스케치25 → 보스-돌출8 (new body)
    with BuildSketch(Plane.XY.offset(127.020467364)):
        with BuildLine():
            Line((-980.231317195, 153), (-755.231317195, 153))
            Line((-755.231317195, 153), (-755.231317195, 5))
            Line((-755.231317195, 5), (-787.616277727, 5))
            ThreePointArc((-787.616277727, 5), (-826.999015062, 38), (-866.381752397, 5))
            Line((-866.381752397, 5), (-980.231317195, 5))
            Line((-980.231317195, 5), (-980.231317195, 153))
        make_face()
    extrude(amount=-EXTRUDE_8_DEPTH)


with BuildPart() as body_5:
    # 스케치27 → 보스-돌출9 (new body)
    with BuildSketch(Plane(origin=(0, 153, 0), x_dir=(1, 0, 0), z_dir=(0, 1, 0))):
        with Locations((-870.231317195, -64.520467364)):
            Rectangle(SKETCH_27_W, SKETCH_27_H)
    extrude(amount=EXTRUDE_9_DEPTH)


with BuildPart() as body_6:
    # 스케치28 → 보스-돌출10 (new body)
    with BuildSketch(Plane(origin=(0, 5, 0), x_dir=(1, 0, 0), z_dir=(0, 1, 0))):
        with Locations((-757.731317195, -64.520467364)):
            Rectangle(SKETCH_28_W, SKETCH_28_H)
    extrude(amount=EXTRUDE_10_DEPTH)


with BuildPart() as body_7:
    # 스케치29 → 보스-돌출11 (new body)
    with BuildSketch(Plane(origin=(0, 0, 2.020467364), x_dir=(-1, 0, 0), z_dir=(0, 0, -1))):
        with BuildLine():
            Line((984.231317195, 0), (984.231317195, 46))
            Line((984.231317195, 46), (823.655113572, 46))
            Line((823.655113572, 46), (790.231317195, 90.909375741))
            Line((790.231317195, 90.909375741), (755.231317195, 90.909375741))
            Line((755.231317195, 90.909375741), (755.231317195, 0))
            Line((755.231317195, 0), (792.288506775, 0))
            ThreePointArc((792.288506775, 0), (827.231317195, 33), (862.174127614, 0))
            Line((862.174127614, 0), (984.231317195, 0))
        make_face()
    extrude(amount=EXTRUDE_11_DEPTH)


with BuildPart() as body_8:
    # 스케치30 → 보스-돌출12 (new body)
    with BuildSketch(Plane(origin=(0, 0, 2.020467364), x_dir=(-1, 0, 0), z_dir=(0, 0, -1))):
        Polygon((755.231317195, 90.909375741), (755.231317195, 158), (985.231317195, 158), (984.231317195, 46), (823.655113572, 46), (790.231317195, 90.909375741), align=None)
    extrude(amount=EXTRUDE_12_DEPTH)


with BuildPart() as body_8_2:
    # 대칭 복사3: mirrored copy
    add(body_8.part.mirror(Plane.XY.offset(64.520467364)))


with BuildPart() as body_9:
    # Mirror 3 2: mirrored copy
    add(body_7.part.mirror(Plane.XY.offset(64.520467364)))


with BuildPart() as body_10:
    # 스케치32 → 보스-돌출13 (new body)
    with BuildSketch(Plane(origin=(-755.231317195, 0, 0), x_dir=(0, 0, -1), z_dir=(1, 0, 0))):
        with Locations((-64.520467364, 124.454687871)):
            Rectangle(SKETCH_32_W, SKETCH_32_H)
    extrude(amount=EXTRUDE_13_DEPTH)


with BuildPart() as body_11:
    # 스케치33 → 보스-돌출14 (new body)
    with BuildSketch(Plane(origin=(-755.231317195, 0, 0), x_dir=(0, 0, -1), z_dir=(1, 0, 0))):
        with Locations((-65.020467364, 45.454687871)):
            Rectangle(SKETCH_33_W, SKETCH_33_H)
    extrude(amount=EXTRUDE_14_DEPTH)


with BuildPart() as body_12:
    # 대칭 복사4: mirrored copy
    add(body_2.part.mirror(Plane.XY.offset(64.520467364)))


with BuildPart() as body_12_2:
    # 스케치35 → 보스-돌출16 (new body)
    with BuildSketch(Plane.XY.offset(122.020467364)):
        with Locations((-870.231317195, 76.5)):
            Rectangle(SKETCH_35_W, SKETCH_35_H)
    extrude(amount=EXTRUDE_16_DEPTH)

    # 스케치36 → 보스-돌출17 (add)
    with BuildSketch(Plane(origin=(-760.231317195, 0, 0), x_dir=(0, 0, -1), z_dir=(1, 0, 0))):
        with Locations((-124.520467364, 76.5)):
            Rectangle(SKETCH_36_W, SKETCH_36_H)
    extrude(amount=EXTRUDE_17_DEPTH)

    # 스케치37 → 컷-돌출17 (cut)
    with BuildSketch(Plane.XY.offset(127.020467364)):
        with BuildLine():
            Line((-862.174127614, 0), (-792.288506775, 0))
            ThreePointArc((-792.288506775, 0), (-827.231317195, 33), (-862.174127614, 0))
        make_face()
    extrude(amount=-CUT_EXTRUDE_17_DEPTH, mode=Mode.SUBTRACT)


with BuildPart() as body_12_3:
    # 스케치40 → 보스-돌출19 (new body)
    with BuildSketch(Plane.XZ):
        with Locations((-757.731317195, 67.020467364)):
            Rectangle(SKETCH_40_W, SKETCH_40_H)
    extrude(amount=-EXTRUDE_19_DEPTH)


solid = Compound([part.part, body_2.part, body_5.part, body_7.part, body_8.part, body_8_2.part, body_9.part, body_10.part, body_11.part, body_12.part, body_12_2.part, body_12_3.part])
